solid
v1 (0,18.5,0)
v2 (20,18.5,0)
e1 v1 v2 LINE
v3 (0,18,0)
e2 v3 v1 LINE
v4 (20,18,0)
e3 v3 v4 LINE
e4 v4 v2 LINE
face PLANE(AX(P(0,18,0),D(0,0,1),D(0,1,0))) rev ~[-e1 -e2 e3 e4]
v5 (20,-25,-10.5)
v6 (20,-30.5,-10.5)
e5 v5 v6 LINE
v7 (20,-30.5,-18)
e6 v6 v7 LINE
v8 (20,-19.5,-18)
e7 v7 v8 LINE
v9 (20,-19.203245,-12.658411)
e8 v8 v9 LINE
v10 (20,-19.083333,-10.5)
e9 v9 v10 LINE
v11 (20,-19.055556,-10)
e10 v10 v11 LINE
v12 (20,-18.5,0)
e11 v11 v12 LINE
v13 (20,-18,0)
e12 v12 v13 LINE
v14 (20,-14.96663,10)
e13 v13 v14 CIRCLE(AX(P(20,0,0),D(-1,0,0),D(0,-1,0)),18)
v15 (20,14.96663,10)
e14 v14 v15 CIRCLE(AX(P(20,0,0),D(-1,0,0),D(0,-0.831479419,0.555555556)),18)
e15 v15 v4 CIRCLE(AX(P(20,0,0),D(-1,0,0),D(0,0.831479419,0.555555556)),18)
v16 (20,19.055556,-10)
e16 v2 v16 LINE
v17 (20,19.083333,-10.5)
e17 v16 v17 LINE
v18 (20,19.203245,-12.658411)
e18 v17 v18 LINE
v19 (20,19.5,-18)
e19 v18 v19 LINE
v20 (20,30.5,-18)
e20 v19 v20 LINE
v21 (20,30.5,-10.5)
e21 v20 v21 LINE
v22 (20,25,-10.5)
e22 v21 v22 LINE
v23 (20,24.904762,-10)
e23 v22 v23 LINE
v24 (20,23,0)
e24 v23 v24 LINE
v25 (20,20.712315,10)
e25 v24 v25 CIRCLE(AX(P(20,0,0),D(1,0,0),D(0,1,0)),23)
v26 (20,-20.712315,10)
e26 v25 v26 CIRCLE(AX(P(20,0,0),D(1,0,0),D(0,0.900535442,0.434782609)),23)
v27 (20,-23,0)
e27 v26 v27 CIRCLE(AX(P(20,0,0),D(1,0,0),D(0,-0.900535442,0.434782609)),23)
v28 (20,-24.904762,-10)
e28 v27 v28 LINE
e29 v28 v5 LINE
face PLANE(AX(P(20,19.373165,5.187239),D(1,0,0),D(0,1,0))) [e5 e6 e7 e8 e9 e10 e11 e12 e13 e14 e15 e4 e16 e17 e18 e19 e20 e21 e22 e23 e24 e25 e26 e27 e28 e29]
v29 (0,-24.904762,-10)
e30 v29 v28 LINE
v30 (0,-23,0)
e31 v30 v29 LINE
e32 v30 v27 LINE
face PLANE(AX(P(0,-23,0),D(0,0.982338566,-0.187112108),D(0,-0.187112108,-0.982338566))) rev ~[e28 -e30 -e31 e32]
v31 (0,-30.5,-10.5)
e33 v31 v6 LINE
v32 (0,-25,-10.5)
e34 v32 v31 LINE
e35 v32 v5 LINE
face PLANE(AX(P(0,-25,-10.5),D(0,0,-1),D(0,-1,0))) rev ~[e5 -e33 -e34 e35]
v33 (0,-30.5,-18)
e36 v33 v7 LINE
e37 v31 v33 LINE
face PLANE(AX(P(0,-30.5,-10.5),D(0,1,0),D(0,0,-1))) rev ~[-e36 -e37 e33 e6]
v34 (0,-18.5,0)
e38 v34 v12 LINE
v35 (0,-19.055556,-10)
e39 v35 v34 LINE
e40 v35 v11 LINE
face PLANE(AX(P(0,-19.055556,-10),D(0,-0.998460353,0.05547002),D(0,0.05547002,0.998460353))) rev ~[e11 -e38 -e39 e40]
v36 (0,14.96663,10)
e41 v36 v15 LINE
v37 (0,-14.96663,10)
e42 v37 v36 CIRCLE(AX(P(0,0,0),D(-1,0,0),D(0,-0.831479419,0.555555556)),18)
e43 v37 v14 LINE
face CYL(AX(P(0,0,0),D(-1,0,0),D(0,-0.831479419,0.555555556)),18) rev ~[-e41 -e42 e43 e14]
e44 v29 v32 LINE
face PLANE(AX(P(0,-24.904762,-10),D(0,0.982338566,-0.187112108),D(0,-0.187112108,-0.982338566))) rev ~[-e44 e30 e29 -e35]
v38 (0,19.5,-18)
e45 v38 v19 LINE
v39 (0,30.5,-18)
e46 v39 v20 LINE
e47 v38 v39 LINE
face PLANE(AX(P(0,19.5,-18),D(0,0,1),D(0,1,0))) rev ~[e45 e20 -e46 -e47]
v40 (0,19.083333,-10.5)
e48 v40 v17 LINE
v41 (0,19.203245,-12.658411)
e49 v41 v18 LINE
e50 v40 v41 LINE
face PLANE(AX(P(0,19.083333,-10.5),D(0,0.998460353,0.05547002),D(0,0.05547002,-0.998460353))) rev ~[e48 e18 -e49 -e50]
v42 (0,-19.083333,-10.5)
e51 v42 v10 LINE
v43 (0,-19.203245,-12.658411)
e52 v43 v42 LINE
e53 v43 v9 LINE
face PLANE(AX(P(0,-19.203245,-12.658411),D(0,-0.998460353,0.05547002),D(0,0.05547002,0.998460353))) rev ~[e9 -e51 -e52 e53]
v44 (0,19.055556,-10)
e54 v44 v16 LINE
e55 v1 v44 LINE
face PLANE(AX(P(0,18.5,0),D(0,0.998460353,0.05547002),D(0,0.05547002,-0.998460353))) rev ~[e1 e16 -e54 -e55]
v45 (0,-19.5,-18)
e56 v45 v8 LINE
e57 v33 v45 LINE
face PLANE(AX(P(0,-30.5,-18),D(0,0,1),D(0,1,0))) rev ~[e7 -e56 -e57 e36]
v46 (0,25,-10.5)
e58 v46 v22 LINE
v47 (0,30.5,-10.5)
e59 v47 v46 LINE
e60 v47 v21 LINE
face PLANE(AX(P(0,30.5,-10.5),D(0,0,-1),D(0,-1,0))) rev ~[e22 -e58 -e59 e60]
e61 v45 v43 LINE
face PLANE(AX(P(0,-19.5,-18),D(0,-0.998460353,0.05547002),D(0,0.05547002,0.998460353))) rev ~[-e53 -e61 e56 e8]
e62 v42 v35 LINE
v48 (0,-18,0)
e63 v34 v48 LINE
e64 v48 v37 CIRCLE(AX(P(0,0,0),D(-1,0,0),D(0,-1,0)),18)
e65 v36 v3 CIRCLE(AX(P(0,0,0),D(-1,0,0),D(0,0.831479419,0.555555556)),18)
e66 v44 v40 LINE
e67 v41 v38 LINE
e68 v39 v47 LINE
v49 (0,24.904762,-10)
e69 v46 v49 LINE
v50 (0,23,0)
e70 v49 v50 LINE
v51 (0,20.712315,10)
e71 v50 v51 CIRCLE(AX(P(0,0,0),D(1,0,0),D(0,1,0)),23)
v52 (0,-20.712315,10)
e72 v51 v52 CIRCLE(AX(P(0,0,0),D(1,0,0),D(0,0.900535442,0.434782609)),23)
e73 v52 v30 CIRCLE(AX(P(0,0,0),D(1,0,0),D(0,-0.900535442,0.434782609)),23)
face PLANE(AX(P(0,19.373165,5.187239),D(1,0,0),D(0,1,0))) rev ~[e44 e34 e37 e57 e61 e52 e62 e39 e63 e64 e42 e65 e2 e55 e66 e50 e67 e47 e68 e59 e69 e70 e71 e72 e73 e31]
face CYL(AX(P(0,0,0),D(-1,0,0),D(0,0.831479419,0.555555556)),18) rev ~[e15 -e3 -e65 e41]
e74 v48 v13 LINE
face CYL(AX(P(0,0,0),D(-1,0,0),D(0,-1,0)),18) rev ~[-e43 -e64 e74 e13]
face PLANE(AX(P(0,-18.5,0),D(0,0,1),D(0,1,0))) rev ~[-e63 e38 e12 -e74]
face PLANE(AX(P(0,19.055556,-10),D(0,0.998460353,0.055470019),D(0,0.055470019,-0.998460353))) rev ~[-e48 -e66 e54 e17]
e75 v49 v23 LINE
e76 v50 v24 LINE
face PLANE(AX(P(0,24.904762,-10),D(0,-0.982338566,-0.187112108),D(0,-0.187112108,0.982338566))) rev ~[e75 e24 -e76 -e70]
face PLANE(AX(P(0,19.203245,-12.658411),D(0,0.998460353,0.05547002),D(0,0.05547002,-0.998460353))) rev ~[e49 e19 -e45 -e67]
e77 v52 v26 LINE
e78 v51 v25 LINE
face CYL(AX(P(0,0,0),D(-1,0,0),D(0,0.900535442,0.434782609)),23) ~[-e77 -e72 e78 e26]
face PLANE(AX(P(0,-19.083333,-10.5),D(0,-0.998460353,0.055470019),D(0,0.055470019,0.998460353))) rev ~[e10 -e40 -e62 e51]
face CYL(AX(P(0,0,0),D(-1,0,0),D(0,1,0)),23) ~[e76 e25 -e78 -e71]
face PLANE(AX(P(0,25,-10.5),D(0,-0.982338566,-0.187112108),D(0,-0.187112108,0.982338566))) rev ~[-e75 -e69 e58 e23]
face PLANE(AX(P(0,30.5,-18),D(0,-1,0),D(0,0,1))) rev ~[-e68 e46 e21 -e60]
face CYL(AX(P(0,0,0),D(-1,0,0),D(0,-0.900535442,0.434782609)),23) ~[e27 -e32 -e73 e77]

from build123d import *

# Parameters (mm, degrees)
F1_DEPTH = 20


with BuildPart() as f1:
    # F0 (on Right) → F1 (new body)
    with BuildSketch(Plane.YZ):
        with BuildLine():
            ThreePointArc((14.9666295471, 10), (17.2249721603, 5.2249721603), (18, 0))
            Line((18, 0), (18.5, 0))
            Line((18.5, 0), (23, 0))
            ThreePointArc((23, 0), (22.4207855469, 5.1291690811), (20.7123151772, 10))
            Line((20.7123151772, 10), (14.9666295471, 10))
        make_face()
        with BuildLine():
            ThreePointArc((-14.9666295471, 10), (0, 18), (14.9666295471, 10))
            Line((14.9666295471, 10), (20.7123151772, 10))
            ThreePointArc((20.7123151772, 10), (0, 23), (-20.7123151772, 10))
            Line((-20.7123151772, 10), (-14.9666295471, 10))
        make_face()
        with BuildLine():
            Line((23, 0), (18.5, 0))
            Line((18.5, 0), (19.0555555556, -10))
            Line((19.0555555556, -10), (20.7123151772, -10))
            ThreePointArc((20.7123151772, -10), (22.4207855469, -5.1291690811), (23, 0))
        make_face()
        with BuildLine():
            ThreePointArc((-18, 0), (-17.2249721603, 5.2249721603), (-14.9666295471, 10))
            Line((-14.9666295471, 10), (-20.7123151772, 10))
            ThreePointArc((-20.7123151772, 10), (-22.4207855469, 5.1291690811), (-23, 0))
            Line((-23, 0), (-18.5, 0))
            Line((-18.5, 0), (-18, 0))
        make_face()
        with BuildLine():
            Line((23, -10), (23, 0))
            ThreePointArc((23, 0), (22.4207855469, -5.1291690811), (20.7123151772, -10))
            Line((20.7123151772, -10), (23, -10))
        make_face()
        Polygon((24.9047619048, -10), (23, 0), (23, -10), align=None)
        with BuildLine():
            Line((20.7123151772, -10), (19.0555555556, -10))
            Line((19.0555555556, -10), (19.0833333333, -10.5))
            Line((19.0833333333, -10.5), (20.4633819297, -10.5))
            ThreePointArc((20.4633819297, -10.5), (20.5893663831, -10.2507556766), (20.7123151772, -10))
        make_face()
        with BuildLine():
            Line((-19.0555555556, -10), (-18.5, 0))
            Line((-18.5, 0), (-23, 0))
            ThreePointArc((-23, 0), (-22.4207855469, -5.1291690811), (-20.7123151772, -10))
            Line((-20.7123151772, -10), (-19.0555555556, -10))
        make_face()
        with BuildLine():
            Line((23, -10), (20.7123151772, -10))
            ThreePointArc((20.7123151772, -10), (20.5893663831, -10.2507556766), (20.4633819297, -10.5))
            Line((20.4633819297, -10.5), (23, -10.5))
            Line((23, -10.5), (23, -10))
        make_face()
        Polygon((24.9047619048, -10), (23, -10), (23, -10.5), (25, -10.5), align=None)
        with BuildLine():
            Line((20.4633819297, -10.5), (19.0833333333, -10.5))
            Line((19.0833333333, -10.5), (19.2032450764, -12.6584113749))
            ThreePointArc((19.2032450764, -12.6584113749), (19.862653635, -11.5963352217), (20.4633819297, -10.5))
        make_face()
        with BuildLine():
            ThreePointArc((-20.7123151772, -10), (-22.4207855469, -5.1291690811), (-23, 0))
            Line((-23, 0), (-24.9047619048, -10))
            Line((-24.9047619048, -10), (-20.7123151772, -10))
        make_face()
        with BuildLine():
            Line((-19.0833333333, -10.5), (-19.0555555556, -10))
            Line((-19.0555555556, -10), (-20.7123151772, -10))
            ThreePointArc((-20.7123151772, -10), (-20.5893663831, -10.2507556766), (-20.4633819297, -10.5))
            Line((-20.4633819297, -10.5), (-19.0833333333, -10.5))
        make_face()
        with BuildLine():
            Line((-19.5, -18), (-19.2032450764, -12.6584113749))
            ThreePointArc((-19.2032450764, -12.6584113749), (-19.862653635, -11.5963352217), (-20.4633819297, -10.5))
            Line((-20.4633819297, -10.5), (-25, -10.5))
            Line((-25, -10.5), (-30.5, -10.5))
            Line((-30.5, -10.5), (-30.5, -18))
            Line((-30.5, -18), (-19.5, -18))
        make_face()
        with BuildLine():
            ThreePointArc((-20.4633819297, -10.5), (-19.862653635, -11.5963352217), (-19.2032450764, -12.6584113749))
            Line((-19.2032450764, -12.6584113749), (-19.0833333333, -10.5))
            Line((-19.0833333333, -10.5), (-20.4633819297, -10.5))
        make_face()
        with BuildLine():
            Line((23, -10.5), (20.4633819297, -10.5))
            ThreePointArc((20.4633819297, -10.5), (19.862653635, -11.5963352217), (19.2032450764, -12.6584113749))
            Line((19.2032450764, -12.6584113749), (19.5, -18))
            Line((19.5, -18), (30.5, -18))
            Line((30.5, -18), (30.5, -10.5))
            Line((30.5, -10.5), (25, -10.5))
            Line((25, -10.5), (23, -10.5))
        make_face()
        with BuildLine():
            ThreePointArc((-20.4633819297, -10.5), (-20.5893663831, -10.2507556766), (-20.7123151772, -10))
            Line((-20.7123151772, -10), (-24.9047619048, -10))
            Line((-24.9047619048, -10), (-25, -10.5))
            Line((-25, -10.5), (-20.4633819297, -10.5))
        make_face()
    extrude(amount=F1_DEPTH)


solid = f1.part
